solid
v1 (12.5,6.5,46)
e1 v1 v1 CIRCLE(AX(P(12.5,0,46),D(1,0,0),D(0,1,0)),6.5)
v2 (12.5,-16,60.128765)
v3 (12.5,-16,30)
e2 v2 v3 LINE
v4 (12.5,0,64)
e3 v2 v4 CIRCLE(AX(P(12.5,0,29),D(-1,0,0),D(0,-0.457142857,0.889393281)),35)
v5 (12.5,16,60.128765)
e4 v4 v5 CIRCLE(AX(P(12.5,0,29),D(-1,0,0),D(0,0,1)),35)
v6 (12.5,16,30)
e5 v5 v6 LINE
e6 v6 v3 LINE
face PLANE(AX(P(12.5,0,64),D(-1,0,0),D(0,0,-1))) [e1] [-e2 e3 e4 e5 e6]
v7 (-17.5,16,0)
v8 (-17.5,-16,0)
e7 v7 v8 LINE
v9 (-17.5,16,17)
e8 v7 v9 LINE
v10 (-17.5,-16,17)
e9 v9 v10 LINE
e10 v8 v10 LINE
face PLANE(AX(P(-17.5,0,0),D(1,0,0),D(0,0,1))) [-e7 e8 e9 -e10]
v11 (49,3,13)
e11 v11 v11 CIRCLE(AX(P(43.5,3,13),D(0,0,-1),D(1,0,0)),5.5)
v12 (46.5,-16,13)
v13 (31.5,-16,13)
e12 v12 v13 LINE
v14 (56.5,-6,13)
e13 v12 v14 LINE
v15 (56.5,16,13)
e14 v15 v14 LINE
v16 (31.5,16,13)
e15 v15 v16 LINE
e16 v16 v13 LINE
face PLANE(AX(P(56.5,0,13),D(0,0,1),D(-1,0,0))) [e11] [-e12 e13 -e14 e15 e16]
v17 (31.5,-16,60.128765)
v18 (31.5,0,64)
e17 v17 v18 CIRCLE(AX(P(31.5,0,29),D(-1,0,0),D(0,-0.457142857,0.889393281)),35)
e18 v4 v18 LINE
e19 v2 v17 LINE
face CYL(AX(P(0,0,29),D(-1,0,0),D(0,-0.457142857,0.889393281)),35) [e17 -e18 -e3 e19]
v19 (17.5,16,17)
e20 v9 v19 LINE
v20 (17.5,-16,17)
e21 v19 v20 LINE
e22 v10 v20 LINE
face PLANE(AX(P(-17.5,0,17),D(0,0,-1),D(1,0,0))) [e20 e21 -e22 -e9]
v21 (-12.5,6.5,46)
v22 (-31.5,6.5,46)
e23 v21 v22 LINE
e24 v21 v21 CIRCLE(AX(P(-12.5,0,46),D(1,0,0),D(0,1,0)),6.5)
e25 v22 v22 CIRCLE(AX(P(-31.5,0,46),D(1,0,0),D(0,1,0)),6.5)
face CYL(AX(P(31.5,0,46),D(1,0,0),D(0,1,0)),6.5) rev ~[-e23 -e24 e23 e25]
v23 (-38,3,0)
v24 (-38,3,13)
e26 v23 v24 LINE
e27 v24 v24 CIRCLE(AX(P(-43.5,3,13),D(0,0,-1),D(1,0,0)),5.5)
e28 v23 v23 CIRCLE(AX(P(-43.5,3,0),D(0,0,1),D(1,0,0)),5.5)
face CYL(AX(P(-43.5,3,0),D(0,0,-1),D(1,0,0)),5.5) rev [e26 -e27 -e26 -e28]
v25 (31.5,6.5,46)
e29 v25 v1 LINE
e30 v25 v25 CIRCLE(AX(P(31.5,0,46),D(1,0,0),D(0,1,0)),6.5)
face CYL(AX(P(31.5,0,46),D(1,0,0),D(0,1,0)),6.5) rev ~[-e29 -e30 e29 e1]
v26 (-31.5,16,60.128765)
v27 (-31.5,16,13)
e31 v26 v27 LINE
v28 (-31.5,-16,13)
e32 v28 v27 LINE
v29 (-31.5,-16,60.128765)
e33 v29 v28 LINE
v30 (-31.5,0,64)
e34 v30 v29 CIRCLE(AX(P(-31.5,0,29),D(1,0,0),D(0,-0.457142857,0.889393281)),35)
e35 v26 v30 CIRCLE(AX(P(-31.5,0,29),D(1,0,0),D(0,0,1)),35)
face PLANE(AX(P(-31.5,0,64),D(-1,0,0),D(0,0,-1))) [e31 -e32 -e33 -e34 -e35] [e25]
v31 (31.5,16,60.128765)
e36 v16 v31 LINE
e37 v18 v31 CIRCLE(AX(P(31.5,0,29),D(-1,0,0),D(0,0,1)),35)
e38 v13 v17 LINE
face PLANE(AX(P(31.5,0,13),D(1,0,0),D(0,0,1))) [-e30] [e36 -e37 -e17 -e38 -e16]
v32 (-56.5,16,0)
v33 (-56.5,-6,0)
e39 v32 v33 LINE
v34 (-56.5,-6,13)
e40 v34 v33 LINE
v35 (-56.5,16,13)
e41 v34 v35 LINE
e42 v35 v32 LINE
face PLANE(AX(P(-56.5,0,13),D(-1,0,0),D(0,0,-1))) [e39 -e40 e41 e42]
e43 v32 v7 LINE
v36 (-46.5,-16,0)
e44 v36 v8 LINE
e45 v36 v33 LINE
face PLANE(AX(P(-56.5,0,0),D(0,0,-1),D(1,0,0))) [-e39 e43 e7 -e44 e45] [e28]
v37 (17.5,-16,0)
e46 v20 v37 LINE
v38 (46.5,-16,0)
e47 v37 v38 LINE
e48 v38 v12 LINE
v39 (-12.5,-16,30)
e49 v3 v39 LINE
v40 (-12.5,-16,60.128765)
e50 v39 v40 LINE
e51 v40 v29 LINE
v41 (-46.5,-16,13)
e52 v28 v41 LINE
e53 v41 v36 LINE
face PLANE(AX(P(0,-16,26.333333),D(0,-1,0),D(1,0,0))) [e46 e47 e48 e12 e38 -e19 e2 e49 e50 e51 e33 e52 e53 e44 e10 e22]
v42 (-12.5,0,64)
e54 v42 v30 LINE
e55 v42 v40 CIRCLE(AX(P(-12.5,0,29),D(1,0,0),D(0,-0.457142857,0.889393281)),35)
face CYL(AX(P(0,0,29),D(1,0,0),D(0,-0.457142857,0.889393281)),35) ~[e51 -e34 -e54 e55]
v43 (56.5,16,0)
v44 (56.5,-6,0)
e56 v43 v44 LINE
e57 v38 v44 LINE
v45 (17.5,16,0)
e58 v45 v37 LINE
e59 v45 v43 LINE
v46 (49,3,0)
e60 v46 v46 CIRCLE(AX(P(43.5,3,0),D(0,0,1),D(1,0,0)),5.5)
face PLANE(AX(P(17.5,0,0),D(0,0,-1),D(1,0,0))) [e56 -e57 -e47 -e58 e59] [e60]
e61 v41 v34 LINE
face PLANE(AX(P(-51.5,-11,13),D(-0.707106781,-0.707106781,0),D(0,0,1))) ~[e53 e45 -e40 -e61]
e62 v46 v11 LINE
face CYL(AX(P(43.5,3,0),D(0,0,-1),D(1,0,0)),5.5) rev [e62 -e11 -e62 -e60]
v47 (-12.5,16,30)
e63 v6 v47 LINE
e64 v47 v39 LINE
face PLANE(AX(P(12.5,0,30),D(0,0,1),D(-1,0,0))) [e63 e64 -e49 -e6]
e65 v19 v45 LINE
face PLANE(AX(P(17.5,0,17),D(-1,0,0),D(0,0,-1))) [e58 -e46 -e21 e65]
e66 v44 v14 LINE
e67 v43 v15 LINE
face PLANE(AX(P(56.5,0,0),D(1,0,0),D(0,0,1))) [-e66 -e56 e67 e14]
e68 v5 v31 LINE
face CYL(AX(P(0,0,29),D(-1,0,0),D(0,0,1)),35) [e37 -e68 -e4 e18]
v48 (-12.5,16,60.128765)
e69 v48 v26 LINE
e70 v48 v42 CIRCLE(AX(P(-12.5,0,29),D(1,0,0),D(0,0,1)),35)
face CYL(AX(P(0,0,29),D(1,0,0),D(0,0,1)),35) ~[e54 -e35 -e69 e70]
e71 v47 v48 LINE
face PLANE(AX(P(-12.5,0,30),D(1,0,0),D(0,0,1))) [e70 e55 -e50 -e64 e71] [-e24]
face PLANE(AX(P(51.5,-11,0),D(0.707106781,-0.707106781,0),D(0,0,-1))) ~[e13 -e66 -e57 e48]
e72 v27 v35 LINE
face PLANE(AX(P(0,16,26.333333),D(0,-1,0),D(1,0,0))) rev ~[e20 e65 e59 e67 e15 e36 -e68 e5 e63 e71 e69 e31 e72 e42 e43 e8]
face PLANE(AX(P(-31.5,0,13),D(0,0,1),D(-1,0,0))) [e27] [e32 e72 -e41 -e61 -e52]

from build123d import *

# Parameters (mm, degrees)
F1_DEPTH      = 16
F3_DEPTH      = 56.501
F3_DEPTH_BACK = 56.501
F4_SIZE       = 10
F5_SIZE       = 10
F6_R          = 5.5
F7_DEPTH      = 64.001
F8_R          = 6.5
F9_DEPTH      = 88.001


with BuildPart() as f1:
    # F0 (on Front) → F1 (new body, symmetric)
    with BuildSketch(Plane.XZ):
        Polygon((-56.5, 13), (-56.5, 0), (-17.5, 0), (-17.5, 17), (17.5, 17), (17.5, 0), (56.5, 0), (56.5, 13), (31.5, 13), (31.5, 64), (12.5, 64), (12.5, 30), (-12.5, 30), (-12.5, 64), (-31.5, 64), (-31.5, 13), align=None)
    extrude(amount=F1_DEPTH, both=True)

    # F2 (on Right) → F3 (cut, two sides)
    with BuildSketch(Plane.YZ) as f3_sk:
        with BuildLine():
            Line((16, 64), (0, 64))
            ThreePointArc((0, 64), (8.230833216, 63.0184271325), (16, 60.1287648325))
            Line((16, 60.1287648325), (16, 64))
        make_face()
        with BuildLine():
            Line((0, 64), (-16, 64))
            Line((-16, 64), (-16, 60.1287648325))
            ThreePointArc((-16, 60.1287648325), (-8.2308332161, 63.0184271325), (0, 64))
        make_face()
    extrude(amount=-F3_DEPTH, mode=Mode.SUBTRACT)
    extrude(f3_sk.sketch, amount=F3_DEPTH_BACK, mode=Mode.SUBTRACT)

    # F4
    f4_edges = [f1.edges().sort_by_distance(p)[0] for p in [
        (56.5, -16, 6.5),
    ]]
    chamfer(f4_edges, length=F4_SIZE)

    # F5
    f5_edges = [f1.edges().sort_by_distance(p)[0] for p in [
        (-56.5, -16, 6.5),
    ]]
    chamfer(f5_edges, length=F5_SIZE)

    # F6 (on Top) → F7 (cut, through all)
    with BuildSketch(Plane.XY):
        with Locations((-43.5, 3)):
            Circle(F6_R)
        with Locations((43.5, 3)):
            Circle(F6_R)
    extrude(amount=F7_DEPTH, mode=Mode.SUBTRACT)

    # F8 (on face) → F9 (cut, through all)
    with BuildSketch(Plane.YZ.offset(31.5)):
        with Locations((0, 46)):
            Circle(F8_R)
    extrude(amount=-F9_DEPTH, mode=Mode.SUBTRACT)


solid = f1.part
